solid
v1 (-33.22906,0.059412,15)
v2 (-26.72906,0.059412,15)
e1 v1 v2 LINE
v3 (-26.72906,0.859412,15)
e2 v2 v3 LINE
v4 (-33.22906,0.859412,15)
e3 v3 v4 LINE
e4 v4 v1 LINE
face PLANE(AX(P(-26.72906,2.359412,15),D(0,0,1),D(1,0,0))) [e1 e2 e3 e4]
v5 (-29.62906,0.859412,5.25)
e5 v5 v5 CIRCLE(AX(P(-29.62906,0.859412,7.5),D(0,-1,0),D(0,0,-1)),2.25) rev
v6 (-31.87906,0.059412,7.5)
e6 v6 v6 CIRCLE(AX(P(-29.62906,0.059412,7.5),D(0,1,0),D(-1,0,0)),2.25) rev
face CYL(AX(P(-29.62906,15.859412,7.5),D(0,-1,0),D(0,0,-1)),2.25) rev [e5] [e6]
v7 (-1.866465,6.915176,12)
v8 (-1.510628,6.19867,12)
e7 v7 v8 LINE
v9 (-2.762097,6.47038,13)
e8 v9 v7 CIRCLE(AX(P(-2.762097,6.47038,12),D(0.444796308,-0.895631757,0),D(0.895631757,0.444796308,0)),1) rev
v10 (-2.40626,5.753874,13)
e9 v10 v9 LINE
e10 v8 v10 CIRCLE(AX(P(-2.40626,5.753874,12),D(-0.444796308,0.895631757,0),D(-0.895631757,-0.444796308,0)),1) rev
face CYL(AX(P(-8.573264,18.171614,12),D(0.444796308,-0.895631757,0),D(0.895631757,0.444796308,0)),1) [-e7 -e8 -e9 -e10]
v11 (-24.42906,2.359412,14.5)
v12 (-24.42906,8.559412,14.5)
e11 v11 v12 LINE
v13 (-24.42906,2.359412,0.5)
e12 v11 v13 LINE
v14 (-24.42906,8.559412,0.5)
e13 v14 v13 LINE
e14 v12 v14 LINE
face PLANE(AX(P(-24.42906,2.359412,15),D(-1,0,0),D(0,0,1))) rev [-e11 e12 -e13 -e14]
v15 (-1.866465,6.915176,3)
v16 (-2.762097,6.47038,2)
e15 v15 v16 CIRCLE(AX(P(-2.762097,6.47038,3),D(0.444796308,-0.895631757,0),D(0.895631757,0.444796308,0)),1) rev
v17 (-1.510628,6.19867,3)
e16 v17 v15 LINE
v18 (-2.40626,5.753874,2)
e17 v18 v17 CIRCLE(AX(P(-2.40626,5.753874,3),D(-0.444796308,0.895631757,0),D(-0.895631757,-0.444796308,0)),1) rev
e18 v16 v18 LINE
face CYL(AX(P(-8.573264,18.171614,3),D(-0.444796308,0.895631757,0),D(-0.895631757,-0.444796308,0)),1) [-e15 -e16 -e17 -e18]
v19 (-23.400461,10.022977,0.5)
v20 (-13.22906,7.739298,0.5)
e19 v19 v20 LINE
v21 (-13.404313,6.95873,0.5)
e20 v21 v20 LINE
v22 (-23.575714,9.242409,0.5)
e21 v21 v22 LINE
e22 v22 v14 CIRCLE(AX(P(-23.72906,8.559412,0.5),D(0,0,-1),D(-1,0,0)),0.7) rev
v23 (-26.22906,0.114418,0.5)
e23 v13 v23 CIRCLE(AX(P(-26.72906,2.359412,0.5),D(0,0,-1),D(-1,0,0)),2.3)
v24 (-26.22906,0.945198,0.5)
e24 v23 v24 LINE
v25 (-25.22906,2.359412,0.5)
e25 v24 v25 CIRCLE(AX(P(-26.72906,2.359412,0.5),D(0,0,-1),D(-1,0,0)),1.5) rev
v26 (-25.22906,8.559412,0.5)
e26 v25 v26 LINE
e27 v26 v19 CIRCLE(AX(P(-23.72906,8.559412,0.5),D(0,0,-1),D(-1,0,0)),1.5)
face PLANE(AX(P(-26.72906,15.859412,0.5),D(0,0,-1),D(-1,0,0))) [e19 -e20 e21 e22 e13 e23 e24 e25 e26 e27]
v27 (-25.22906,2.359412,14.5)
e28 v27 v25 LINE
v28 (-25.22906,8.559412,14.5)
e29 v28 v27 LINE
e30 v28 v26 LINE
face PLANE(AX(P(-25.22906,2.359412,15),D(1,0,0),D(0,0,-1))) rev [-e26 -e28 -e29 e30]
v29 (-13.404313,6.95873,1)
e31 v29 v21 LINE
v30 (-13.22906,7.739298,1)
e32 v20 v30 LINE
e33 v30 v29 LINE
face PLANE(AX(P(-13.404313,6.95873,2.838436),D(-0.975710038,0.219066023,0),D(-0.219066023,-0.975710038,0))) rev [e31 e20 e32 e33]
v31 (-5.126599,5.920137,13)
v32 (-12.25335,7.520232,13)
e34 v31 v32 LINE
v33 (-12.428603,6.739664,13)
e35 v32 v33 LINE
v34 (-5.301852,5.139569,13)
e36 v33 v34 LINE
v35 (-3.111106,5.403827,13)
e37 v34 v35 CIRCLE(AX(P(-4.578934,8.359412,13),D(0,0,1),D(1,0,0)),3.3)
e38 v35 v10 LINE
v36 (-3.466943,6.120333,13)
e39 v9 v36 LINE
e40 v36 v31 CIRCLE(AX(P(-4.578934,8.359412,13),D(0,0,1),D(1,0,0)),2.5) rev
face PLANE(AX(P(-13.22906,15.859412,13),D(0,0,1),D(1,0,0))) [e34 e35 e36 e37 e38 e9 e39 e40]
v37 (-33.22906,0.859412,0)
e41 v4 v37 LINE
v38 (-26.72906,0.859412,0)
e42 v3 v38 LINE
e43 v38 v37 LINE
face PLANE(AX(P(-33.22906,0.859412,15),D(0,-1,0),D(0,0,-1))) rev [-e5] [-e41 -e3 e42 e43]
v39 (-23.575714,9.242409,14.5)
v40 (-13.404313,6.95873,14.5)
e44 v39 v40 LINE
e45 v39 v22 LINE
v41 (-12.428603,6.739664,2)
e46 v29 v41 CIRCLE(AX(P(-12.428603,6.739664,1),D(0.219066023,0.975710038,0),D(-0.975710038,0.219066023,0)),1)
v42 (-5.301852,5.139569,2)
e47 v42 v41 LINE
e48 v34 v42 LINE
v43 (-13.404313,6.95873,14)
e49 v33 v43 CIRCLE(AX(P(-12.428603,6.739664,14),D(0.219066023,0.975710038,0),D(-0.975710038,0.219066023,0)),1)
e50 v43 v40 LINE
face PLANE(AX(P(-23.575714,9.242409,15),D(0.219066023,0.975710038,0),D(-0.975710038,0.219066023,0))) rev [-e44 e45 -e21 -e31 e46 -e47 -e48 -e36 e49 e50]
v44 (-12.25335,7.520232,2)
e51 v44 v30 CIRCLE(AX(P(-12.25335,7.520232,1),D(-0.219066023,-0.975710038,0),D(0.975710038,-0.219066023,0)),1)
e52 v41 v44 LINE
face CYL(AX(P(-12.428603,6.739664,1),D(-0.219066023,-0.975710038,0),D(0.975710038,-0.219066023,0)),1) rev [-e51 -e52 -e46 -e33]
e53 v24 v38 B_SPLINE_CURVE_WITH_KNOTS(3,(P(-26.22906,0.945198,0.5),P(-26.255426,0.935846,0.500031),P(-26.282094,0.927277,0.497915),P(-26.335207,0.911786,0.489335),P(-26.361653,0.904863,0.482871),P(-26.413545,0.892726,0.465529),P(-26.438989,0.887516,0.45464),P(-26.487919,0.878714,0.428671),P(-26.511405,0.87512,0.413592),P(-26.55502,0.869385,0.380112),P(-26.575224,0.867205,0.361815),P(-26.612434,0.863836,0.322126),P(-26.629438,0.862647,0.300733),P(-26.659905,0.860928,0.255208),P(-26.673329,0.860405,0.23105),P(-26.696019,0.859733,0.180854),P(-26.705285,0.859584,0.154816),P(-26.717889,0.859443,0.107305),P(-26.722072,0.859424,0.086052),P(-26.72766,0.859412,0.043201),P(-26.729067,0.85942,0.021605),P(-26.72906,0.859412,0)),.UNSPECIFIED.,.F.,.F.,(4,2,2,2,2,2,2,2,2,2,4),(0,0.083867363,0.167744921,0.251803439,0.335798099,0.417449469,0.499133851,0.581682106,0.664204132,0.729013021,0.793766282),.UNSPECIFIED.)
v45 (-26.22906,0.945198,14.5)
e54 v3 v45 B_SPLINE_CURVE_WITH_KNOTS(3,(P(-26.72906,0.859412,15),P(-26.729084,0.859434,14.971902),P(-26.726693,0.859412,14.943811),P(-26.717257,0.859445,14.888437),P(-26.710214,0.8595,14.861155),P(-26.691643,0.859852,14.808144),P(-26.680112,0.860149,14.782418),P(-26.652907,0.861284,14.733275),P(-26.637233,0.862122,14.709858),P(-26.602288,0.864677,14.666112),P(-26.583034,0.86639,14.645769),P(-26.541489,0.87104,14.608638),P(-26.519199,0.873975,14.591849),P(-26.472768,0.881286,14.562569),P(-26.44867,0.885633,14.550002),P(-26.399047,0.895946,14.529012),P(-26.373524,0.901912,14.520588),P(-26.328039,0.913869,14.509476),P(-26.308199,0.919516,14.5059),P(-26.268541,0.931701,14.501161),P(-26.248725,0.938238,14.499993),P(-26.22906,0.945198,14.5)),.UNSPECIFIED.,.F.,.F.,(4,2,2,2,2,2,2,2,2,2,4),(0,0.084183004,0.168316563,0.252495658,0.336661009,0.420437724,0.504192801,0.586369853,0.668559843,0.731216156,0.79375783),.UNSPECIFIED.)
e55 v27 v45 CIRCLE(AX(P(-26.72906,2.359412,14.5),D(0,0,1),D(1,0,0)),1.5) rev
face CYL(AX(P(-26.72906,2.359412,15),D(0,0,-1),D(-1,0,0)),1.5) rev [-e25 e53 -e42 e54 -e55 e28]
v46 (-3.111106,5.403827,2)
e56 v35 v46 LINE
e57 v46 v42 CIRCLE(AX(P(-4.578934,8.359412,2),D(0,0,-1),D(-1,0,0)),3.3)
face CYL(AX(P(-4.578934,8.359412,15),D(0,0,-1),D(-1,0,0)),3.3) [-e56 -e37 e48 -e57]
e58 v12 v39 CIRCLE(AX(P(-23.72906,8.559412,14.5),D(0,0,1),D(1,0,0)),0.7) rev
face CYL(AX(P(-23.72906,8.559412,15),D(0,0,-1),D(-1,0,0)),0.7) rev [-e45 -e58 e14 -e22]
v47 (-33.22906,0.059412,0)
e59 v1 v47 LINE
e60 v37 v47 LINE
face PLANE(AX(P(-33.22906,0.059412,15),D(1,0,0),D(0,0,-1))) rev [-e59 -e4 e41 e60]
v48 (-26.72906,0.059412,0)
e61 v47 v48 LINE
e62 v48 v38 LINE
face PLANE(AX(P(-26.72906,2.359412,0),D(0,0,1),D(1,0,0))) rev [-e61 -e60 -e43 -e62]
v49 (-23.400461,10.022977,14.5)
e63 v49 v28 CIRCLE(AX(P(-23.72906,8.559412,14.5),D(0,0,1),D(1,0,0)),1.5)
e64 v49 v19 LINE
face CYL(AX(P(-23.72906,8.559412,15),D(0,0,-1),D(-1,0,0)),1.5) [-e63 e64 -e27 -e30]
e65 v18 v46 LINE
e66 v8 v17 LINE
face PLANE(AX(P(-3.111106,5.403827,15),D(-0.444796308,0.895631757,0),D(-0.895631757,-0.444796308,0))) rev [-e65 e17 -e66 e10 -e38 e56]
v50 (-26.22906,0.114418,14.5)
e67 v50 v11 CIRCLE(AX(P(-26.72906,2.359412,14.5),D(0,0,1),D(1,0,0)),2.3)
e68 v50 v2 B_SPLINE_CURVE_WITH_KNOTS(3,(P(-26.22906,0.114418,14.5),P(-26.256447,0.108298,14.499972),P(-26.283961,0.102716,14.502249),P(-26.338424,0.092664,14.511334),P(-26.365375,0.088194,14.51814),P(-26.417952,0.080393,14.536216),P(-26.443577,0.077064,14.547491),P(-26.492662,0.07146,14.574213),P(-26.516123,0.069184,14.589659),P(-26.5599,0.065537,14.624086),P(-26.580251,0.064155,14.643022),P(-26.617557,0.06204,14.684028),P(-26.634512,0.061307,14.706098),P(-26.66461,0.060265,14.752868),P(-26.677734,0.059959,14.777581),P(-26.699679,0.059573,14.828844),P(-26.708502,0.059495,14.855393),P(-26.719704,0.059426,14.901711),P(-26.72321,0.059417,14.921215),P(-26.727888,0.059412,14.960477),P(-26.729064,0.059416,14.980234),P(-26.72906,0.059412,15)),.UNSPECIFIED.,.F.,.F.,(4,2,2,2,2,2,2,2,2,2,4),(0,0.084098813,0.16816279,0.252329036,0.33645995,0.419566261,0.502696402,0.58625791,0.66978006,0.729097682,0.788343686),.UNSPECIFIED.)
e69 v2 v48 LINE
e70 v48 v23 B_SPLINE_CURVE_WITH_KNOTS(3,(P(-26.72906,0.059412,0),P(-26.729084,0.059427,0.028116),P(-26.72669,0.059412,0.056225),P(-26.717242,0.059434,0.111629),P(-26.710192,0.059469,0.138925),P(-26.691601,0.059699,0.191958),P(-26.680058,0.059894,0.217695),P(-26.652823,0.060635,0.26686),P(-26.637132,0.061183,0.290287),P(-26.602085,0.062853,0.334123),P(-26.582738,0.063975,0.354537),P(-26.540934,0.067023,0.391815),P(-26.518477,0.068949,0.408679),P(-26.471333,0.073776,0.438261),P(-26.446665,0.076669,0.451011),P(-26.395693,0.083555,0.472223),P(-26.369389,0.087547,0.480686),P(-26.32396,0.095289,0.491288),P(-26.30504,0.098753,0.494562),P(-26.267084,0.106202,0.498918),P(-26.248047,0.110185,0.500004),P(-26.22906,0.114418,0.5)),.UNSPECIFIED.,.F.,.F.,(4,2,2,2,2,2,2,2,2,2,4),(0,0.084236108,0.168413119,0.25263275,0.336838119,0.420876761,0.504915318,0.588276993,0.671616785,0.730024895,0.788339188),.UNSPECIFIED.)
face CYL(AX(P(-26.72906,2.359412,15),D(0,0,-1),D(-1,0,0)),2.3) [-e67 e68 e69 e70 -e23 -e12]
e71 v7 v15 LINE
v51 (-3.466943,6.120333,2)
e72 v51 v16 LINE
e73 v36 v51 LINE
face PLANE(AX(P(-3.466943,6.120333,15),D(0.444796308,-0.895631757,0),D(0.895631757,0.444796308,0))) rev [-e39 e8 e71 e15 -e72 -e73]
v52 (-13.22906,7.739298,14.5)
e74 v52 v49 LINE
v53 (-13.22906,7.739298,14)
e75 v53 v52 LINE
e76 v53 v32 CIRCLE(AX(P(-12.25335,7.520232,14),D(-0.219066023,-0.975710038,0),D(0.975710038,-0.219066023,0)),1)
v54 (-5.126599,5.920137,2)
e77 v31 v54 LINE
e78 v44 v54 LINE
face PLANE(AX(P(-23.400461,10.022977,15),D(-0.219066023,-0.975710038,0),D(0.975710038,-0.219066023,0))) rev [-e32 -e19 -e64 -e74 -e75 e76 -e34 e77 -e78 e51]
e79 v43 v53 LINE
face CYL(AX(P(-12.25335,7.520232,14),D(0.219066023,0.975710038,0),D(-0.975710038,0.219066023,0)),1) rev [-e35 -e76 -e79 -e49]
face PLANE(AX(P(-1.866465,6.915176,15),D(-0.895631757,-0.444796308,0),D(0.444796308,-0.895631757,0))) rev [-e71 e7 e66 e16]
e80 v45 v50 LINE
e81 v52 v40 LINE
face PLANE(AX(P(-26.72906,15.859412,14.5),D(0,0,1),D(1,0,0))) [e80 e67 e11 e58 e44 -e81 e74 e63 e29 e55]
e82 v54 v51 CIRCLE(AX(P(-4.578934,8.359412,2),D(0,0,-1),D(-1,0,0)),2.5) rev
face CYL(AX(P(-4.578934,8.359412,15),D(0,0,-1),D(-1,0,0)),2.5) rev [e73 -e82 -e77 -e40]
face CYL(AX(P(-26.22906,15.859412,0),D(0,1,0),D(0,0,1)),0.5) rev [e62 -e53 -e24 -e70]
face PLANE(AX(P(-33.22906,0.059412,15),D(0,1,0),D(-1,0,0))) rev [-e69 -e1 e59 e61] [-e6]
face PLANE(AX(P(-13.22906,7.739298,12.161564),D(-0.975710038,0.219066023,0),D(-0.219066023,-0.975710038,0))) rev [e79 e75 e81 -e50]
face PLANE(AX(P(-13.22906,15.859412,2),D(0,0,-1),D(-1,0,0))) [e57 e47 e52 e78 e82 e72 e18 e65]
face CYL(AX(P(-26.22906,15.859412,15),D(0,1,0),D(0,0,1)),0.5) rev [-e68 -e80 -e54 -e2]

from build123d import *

# Parameters (mm, degrees)
EXTRUDE_1_DEPTH          = 15
CUT_EXTRUDE_1_DEPTH      = 15
CUT_EXTRUDE_1_DEPTH_BACK = 15
SKETCH_2_R               = 2.25
CUT_EXTRUDE_2_DEPTH      = 1.5
CUT_EXTRUDE_3_DEPTH      = 1.5
FILLET_1_R               = 0.5
FILLET_2_R               = 1


with BuildPart() as part:
    # Эскиз1 → Вытянуть1 (new body)
    with BuildSketch(Plane.XY):
        with BuildLine():
            Line((-25.229060352, 2.359412), (-25.229060352, 8.559412))
            ThreePointArc((-25.229060352, 8.559412), (-24.666370719, 9.730500928), (-23.400461317, 10.022977057))
            Line((-23.400461317, 10.022977057), (-5.12659913, 5.920136906))
            ThreePointArc((-5.12659913, 5.920136906), (-4.279542261, 5.877403833), (-3.466943303, 6.120332607))
            Line((-3.466943303, 6.120332607), (-1.866464924, 6.915175876))
            Line((-1.866464924, 6.915175876), (-1.510627877, 6.19867047))
            Line((-1.510627877, 6.19867047), (-3.111106257, 5.403827201))
            ThreePointArc((-3.111106257, 5.403827201), (-4.183736881, 5.083161219), (-5.301851949, 5.139568876))
            Line((-5.301851949, 5.139568876), (-23.575714136, 9.242409026))
            ThreePointArc((-23.575714136, 9.242409026), (-24.166471856, 9.105920166), (-24.429060352, 8.559412))
            Line((-24.429060352, 8.559412), (-24.429060352, 2.359412))
            ThreePointArc((-24.429060352, 2.359412), (-25.102714755, 0.733066403), (-26.729060352, 0.059412))
            Line((-26.729060352, 0.059412), (-33.229060352, 0.059412))
            Line((-33.229060352, 0.059412), (-33.229060352, 0.859412))
            Line((-33.229060352, 0.859412), (-26.729060352, 0.859412))
            ThreePointArc((-26.729060352, 0.859412), (-25.66840018, 1.298751828), (-25.229060352, 2.359412))
        make_face()
    extrude(amount=EXTRUDE_1_DEPTH)

    # Эскиз2 → Вырез-Вытянуть1 (cut, two sides: drawn at the far end of the back side and taken through both)
    with BuildSketch(Plane(origin=(0, 0.859412, 0), x_dir=(1, 0, 0), z_dir=(0, 1, 0)).offset(-CUT_EXTRUDE_1_DEPTH_BACK)):
        with Locations(Location((-29.629060352, -7.5, 0), (0, 0, 90))):
            Circle(SKETCH_2_R)
        Polygon((-13.229060352, -0.5), (-13.229060352, -2), (-0.791842207, -2), (-0.791842207, 0), (-26.729060352, 0), (-26.729060352, -0.5), align=None)
        Polygon((-26.729060352, -15), (-0.791842207, -15), (-0.791842207, -13), (-13.229060352, -13), (-13.229060352, -14.5), (-26.729060352, -14.5), align=None)
    extrude(amount=CUT_EXTRUDE_1_DEPTH + CUT_EXTRUDE_1_DEPTH_BACK, mode=Mode.SUBTRACT)

    # Эскиз3 → Вырез-Вытянуть2 (cut)
    with BuildSketch(Plane.XY.offset(14.5)):
        Polygon((-13.229060352, 7.739298224), (-13.229060352, 6.919382502), (-13.40431317, 6.958730194), align=None)
    extrude(amount=-CUT_EXTRUDE_2_DEPTH, mode=Mode.SUBTRACT)

    # Эскиз4 → Вырез-Вытянуть3 (cut)
    with BuildSketch(Plane(origin=(0, 0, 0.5), x_dir=(-1, 0, 0), z_dir=(0, 0, -1))):
        Polygon((13.229060352, 7.739298224), (13.229060352, 6.919382502), (13.40431317, 6.958730194), align=None)
    extrude(amount=-CUT_EXTRUDE_3_DEPTH, mode=Mode.SUBTRACT)

    # Скругление1
    # the kernel refuses this fillet: 0.5 mm, written as the material it adds along each edge
    with BuildSketch(Plane(origin=(-26.729060352, 2.109412, 14.5), x_dir=(0, 0, 1), z_dir=(0, -1, 0))) as fillet_1_piece_1_section:
        with BuildLine():
            CenterArc((FILLET_1_R, -FILLET_1_R), FILLET_1_R, 90, 90)
            Line((0, -FILLET_1_R), (0, 0))
            Line((0, 0), (FILLET_1_R, 0))
        make_face()
    fillet_1_piece_1 = extrude(amount=3.3, mode=Mode.PRIVATE)
    fillet_1_piece_1 = fillet_1_piece_1 - Plane(origin=(-26.729060352, 2.359412, 14.543282734), x_dir=(0, -1, 0), z_dir=(0, 0, -1)) * Cylinder(1.5, 9, mode=Mode.PRIVATE)
    fillet_1_piece_1 = fillet_1_piece_1 & Plane(origin=(-26.729060352, 2.359412, 14.543282734), x_dir=(1, 0, 0), z_dir=(0, 0, -1)) * Cylinder(2.3, 9, mode=Mode.PRIVATE)
    add(fillet_1_piece_1)
    with BuildSketch(Plane(origin=(-26.729060352, 2.109412, 0.5), x_dir=(0, 0, -1), z_dir=(0, -1, 0))) as fillet_1_piece_2_section:
        with BuildLine():
            CenterArc((FILLET_1_R, FILLET_1_R), FILLET_1_R, 180, 90)
            Line((0, FILLET_1_R), (0, 0))
            Line((0, 0), (FILLET_1_R, 0))
        make_face()
    fillet_1_piece_2 = extrude(amount=3.3, mode=Mode.PRIVATE)
    fillet_1_piece_2 = fillet_1_piece_2 - Plane(origin=(-26.729060352, 2.359412, 0.456717266), x_dir=(0, -1, 0), z_dir=(0, 0, -1)) * Cylinder(1.5, 9, mode=Mode.PRIVATE)
    fillet_1_piece_2 = fillet_1_piece_2 & Plane(origin=(-26.729060352, 2.359412, 0.456717266), x_dir=(1, 0, 0), z_dir=(0, 0, -1)) * Cylinder(2.3, 9, mode=Mode.PRIVATE)
    add(fillet_1_piece_2)

    # Скругление2
    fillet_2_edges = [part.edges().sort_by_distance(p)[0] for p in [
        (-1.6885464, 6.556923173, 13),
        (-13.316686761, 7.349014209, 13),
        (-13.316686761, 7.349014209, 2),
        (-1.6885464, 6.556923173, 2),
    ]]
    fillet(fillet_2_edges, radius=FILLET_2_R)


solid = part.part
